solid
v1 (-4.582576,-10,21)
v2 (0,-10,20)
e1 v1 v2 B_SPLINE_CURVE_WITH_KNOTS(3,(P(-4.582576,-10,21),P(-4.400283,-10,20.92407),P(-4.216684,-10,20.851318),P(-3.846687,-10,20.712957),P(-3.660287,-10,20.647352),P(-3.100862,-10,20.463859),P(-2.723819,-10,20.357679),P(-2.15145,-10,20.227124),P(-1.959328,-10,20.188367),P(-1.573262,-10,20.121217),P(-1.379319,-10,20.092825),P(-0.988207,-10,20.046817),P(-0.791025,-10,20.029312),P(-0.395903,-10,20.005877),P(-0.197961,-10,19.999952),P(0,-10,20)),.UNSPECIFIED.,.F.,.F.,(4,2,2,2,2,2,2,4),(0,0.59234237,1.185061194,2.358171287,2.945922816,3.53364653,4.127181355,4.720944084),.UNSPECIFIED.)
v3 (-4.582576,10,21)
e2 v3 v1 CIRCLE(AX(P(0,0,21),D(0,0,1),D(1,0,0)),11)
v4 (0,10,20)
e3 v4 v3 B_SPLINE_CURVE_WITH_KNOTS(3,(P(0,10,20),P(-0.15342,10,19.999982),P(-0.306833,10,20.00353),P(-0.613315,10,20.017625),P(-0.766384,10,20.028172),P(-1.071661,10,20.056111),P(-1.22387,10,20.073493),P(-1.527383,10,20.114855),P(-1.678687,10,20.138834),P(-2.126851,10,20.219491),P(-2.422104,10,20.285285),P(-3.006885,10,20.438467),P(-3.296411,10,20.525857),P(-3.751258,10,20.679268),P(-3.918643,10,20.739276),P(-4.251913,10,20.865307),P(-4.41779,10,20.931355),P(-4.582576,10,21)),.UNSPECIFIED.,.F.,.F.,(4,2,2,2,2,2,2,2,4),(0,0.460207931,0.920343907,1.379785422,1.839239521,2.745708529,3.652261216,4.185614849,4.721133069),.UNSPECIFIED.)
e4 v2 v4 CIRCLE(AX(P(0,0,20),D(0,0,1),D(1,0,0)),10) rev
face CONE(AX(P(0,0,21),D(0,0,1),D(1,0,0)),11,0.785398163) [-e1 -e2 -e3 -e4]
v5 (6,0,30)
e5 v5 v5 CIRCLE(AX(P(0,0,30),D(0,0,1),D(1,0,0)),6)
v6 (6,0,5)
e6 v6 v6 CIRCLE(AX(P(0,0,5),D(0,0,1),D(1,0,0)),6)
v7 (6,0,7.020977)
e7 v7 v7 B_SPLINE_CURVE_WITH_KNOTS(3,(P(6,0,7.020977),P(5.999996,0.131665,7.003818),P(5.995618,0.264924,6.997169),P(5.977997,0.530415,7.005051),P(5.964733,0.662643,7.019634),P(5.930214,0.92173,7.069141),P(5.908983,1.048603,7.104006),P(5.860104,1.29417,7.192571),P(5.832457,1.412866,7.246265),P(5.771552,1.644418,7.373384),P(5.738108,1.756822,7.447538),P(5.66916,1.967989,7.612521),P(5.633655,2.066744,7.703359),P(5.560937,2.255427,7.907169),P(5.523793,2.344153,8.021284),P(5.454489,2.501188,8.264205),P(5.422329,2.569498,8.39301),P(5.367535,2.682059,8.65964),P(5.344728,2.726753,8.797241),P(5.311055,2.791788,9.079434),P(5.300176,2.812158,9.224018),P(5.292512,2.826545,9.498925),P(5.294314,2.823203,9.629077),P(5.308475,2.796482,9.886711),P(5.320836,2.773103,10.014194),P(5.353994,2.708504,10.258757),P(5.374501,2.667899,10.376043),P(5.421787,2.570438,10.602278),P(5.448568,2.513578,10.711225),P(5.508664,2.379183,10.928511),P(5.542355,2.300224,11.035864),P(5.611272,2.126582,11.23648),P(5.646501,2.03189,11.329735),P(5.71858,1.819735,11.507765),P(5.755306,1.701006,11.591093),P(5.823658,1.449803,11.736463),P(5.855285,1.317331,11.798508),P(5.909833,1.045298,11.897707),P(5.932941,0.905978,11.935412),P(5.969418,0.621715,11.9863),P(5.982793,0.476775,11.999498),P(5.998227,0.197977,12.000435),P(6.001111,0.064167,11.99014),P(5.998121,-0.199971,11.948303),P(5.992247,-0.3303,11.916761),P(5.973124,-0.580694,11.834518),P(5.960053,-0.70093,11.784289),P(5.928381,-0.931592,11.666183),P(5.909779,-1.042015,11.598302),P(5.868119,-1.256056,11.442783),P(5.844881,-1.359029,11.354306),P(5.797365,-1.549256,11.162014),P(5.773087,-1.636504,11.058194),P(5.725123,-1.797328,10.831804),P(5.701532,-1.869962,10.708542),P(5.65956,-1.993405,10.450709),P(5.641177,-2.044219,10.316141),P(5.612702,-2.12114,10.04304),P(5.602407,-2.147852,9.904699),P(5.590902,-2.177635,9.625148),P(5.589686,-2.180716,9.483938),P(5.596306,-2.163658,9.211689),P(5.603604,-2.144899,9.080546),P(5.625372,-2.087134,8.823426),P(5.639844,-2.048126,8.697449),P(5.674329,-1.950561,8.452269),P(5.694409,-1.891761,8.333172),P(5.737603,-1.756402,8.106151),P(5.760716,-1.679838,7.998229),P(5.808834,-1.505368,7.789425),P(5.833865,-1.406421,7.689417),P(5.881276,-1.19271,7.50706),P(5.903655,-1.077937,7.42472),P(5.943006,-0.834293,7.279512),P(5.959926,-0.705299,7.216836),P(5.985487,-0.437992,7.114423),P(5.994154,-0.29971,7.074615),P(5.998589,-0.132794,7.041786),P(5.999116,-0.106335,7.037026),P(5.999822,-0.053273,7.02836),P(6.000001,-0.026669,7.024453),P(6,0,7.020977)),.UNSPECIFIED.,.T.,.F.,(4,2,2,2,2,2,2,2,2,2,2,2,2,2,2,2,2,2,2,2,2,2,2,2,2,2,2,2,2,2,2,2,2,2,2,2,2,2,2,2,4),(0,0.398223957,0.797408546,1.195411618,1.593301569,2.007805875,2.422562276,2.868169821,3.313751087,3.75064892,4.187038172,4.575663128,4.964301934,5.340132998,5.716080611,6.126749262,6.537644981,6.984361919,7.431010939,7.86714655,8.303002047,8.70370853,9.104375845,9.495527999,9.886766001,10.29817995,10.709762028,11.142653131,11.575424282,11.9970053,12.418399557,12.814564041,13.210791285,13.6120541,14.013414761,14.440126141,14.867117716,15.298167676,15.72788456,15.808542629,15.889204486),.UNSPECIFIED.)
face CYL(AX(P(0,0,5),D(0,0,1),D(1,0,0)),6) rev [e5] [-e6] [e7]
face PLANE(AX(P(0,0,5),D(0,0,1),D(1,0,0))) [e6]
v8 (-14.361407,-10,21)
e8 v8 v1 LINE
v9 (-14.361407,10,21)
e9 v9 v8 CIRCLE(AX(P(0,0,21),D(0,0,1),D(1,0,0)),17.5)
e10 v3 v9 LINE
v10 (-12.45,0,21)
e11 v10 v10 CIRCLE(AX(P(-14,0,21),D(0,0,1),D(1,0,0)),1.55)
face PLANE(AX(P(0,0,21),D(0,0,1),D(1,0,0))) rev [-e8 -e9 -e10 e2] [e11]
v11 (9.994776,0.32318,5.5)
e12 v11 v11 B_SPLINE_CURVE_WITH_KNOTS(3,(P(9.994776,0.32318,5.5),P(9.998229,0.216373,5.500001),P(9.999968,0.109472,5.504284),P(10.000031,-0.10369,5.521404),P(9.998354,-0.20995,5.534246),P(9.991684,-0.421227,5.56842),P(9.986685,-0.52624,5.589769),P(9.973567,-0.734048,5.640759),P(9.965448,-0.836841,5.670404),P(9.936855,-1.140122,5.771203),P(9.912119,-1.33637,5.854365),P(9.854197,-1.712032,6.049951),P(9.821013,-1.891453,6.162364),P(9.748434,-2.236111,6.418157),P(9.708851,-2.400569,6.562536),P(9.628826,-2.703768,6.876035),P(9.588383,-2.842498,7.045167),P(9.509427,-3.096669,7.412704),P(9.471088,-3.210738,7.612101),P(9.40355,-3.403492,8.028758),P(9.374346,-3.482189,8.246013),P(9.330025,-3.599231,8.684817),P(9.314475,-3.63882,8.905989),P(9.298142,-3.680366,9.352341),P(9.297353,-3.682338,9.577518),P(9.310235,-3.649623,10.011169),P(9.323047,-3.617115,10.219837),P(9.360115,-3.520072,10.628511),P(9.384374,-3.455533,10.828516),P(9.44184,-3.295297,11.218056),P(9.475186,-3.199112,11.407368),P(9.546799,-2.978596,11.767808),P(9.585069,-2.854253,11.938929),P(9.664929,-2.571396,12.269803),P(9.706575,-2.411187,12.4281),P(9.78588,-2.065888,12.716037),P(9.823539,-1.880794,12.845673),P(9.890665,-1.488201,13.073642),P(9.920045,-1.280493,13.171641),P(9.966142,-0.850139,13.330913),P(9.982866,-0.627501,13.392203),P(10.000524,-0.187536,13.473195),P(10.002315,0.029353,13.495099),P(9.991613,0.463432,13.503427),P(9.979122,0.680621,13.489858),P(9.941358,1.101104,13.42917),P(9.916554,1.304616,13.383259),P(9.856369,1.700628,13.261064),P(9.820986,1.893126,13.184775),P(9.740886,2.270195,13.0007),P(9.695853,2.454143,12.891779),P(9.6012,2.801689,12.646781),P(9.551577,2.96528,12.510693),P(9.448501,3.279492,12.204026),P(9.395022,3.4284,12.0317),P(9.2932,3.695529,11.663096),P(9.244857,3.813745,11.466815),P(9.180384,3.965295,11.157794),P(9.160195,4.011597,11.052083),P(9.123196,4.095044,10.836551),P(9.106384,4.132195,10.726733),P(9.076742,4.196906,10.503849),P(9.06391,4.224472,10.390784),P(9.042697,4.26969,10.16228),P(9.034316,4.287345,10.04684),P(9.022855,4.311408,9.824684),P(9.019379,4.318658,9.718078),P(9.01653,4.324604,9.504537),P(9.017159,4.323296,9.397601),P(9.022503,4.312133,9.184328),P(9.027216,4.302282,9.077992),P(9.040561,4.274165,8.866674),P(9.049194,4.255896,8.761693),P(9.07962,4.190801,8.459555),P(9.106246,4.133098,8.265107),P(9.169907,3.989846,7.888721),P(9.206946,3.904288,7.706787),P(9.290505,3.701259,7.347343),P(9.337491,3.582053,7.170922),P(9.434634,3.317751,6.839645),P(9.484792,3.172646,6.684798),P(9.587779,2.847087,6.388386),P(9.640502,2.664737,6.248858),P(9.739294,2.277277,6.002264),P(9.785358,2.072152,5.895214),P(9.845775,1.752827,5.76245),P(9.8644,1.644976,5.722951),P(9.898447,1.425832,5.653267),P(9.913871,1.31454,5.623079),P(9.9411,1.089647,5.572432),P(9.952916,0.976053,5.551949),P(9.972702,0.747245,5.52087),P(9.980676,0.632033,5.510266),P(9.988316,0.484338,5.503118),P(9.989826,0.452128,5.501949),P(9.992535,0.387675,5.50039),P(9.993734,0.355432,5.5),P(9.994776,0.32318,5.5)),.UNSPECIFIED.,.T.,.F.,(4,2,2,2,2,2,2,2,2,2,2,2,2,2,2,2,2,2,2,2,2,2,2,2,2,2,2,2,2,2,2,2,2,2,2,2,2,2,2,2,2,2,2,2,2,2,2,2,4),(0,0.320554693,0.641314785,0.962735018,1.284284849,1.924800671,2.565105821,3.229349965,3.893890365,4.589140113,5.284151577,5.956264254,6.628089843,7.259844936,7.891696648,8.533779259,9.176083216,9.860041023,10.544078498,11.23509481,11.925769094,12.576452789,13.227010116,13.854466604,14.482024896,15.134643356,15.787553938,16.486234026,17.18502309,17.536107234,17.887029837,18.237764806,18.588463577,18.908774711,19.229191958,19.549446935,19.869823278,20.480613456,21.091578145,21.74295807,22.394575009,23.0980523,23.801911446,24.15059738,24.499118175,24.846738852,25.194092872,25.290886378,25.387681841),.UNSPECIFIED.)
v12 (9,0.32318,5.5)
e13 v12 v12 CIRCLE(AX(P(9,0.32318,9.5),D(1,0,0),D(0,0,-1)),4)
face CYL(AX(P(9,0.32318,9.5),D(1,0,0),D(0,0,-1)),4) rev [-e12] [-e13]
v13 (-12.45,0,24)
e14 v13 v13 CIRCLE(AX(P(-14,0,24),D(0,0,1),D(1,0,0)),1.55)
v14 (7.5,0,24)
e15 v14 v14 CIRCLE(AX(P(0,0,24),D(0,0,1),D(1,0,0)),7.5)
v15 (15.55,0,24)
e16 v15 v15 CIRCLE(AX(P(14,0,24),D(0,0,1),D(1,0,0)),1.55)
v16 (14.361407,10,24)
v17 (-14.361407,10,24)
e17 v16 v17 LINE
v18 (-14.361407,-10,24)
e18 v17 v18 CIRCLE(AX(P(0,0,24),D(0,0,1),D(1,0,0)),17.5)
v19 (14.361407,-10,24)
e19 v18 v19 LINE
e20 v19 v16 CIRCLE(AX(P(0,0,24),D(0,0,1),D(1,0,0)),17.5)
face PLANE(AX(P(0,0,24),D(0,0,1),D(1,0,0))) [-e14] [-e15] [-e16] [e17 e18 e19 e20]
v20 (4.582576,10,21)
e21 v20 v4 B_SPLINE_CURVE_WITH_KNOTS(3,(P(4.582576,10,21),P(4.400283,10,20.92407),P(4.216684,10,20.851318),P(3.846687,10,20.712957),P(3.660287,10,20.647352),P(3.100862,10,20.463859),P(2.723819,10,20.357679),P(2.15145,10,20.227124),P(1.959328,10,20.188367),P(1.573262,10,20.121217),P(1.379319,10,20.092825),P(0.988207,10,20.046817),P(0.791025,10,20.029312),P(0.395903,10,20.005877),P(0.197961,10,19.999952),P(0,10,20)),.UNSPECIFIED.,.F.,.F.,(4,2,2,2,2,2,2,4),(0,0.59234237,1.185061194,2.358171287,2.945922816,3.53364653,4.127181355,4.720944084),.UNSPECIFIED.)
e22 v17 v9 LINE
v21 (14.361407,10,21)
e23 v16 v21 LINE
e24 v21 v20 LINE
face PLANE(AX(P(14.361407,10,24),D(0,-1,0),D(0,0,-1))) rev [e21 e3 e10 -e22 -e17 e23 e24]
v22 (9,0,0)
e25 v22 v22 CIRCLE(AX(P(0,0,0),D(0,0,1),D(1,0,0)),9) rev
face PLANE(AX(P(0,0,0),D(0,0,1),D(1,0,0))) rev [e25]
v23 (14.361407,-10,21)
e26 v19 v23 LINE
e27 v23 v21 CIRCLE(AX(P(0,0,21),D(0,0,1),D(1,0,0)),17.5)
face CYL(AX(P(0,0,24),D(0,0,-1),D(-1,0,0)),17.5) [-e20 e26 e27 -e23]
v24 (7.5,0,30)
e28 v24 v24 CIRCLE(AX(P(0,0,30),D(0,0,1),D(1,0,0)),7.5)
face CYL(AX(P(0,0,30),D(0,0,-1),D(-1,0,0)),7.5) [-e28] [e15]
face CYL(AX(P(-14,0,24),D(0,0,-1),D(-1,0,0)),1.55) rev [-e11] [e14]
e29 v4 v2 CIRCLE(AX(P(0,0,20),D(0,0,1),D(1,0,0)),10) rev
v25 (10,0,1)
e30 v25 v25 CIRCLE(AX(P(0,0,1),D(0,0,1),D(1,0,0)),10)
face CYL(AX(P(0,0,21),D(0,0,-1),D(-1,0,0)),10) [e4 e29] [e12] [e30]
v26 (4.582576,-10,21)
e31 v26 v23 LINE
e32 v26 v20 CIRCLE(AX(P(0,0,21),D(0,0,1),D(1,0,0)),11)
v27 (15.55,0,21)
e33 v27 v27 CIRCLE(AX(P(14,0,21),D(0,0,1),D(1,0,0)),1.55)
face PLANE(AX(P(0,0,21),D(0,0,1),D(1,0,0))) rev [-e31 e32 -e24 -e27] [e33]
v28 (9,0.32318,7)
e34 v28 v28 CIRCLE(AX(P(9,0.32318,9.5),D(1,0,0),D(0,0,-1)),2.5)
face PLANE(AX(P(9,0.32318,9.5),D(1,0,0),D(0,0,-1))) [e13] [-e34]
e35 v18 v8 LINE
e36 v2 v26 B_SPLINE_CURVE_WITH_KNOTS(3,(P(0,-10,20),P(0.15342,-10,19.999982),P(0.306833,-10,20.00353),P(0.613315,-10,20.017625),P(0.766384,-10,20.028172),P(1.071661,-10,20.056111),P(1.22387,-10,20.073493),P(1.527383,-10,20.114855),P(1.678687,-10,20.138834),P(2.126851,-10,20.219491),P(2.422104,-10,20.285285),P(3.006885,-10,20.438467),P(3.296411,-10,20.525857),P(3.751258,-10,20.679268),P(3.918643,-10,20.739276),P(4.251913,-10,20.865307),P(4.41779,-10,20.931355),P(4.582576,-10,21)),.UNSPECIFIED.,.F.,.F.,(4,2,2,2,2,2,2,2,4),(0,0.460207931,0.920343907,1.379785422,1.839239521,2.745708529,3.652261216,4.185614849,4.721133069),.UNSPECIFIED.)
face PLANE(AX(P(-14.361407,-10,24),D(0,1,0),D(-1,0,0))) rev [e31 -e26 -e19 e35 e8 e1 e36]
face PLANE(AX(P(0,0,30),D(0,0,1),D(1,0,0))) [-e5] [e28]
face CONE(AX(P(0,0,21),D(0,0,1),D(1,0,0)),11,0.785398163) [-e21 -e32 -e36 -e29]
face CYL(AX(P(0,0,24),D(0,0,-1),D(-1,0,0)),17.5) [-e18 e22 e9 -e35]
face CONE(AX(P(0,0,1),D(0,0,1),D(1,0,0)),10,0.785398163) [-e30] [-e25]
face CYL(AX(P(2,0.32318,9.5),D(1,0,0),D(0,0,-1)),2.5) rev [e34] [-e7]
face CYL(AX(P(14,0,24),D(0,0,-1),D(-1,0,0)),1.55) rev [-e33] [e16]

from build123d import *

# Parameters (mm, degrees)
SKETCH2_R           = 10
BOSS_EXTRUDE1_DEPTH = 21
SKETCH3_R           = 1.55
BOSS_EXTRUDE3_DEPTH = 3
SKETCH4_R           = 7.5
BOSS_EXTRUDE4_DEPTH = 6
SKETCH5_R           = 6
CUT_EXTRUDE1_DEPTH  = 25
SKETCH6_R           = 4
CUT_EXTRUDE2_DEPTH  = 1
SKETCH7_R           = 2.5
CUT_EXTRUDE3_DEPTH  = 7
CHAMFER1_SIZE       = 1
CHAMFER2_SIZE       = 1


with BuildPart() as part:
    # Sketch2 → Boss-Extrude1 (new body)
    with BuildSketch(Plane.XY):
        with Locations(Location((0, 0, 0), (0, 0, 180))):
            Circle(SKETCH2_R)
    extrude(amount=BOSS_EXTRUDE1_DEPTH)

    # Sketch3 → Boss-Extrude3 (add)
    with BuildSketch(Plane.XY.offset(21)):
        with BuildLine():
            Line((14.361406616, 10), (-14.361406616, 10))
            ThreePointArc((-14.361406616, 10), (-17.5, 0), (-14.361406616, -10))
            Line((-14.361406616, -10), (14.361406616, -10))
            ThreePointArc((14.361406616, -10), (17.5, 0), (14.361406616, 10))
        make_face()
        with Locations((14, 0)):
            Circle(SKETCH3_R, mode=Mode.SUBTRACT)
        with Locations((-14, 0)):
            Circle(SKETCH3_R, mode=Mode.SUBTRACT)
    extrude(amount=BOSS_EXTRUDE3_DEPTH)

    # Sketch4 → Boss-Extrude4 (add)
    with BuildSketch(Plane.XY.offset(24)):
        Circle(SKETCH4_R)
    extrude(amount=BOSS_EXTRUDE4_DEPTH)

    # Sketch5 → Cut-Extrude1 (cut)
    with BuildSketch(Plane.XY.offset(30)):
        Circle(SKETCH5_R)
    extrude(amount=-CUT_EXTRUDE1_DEPTH, mode=Mode.SUBTRACT)

    # Sketch6 → Cut-Extrude2 (cut)
    with BuildSketch(Plane(origin=(10, 0, 0), x_dir=(0, 0, -1), z_dir=(1, 0, 0))):
        with Locations((-9.5, 0.3231801)):
            Circle(SKETCH6_R)
    extrude(amount=-CUT_EXTRUDE2_DEPTH, mode=Mode.SUBTRACT)

    # Sketch7 → Cut-Extrude3 (cut)
    with BuildSketch(Plane(origin=(9, 0, 0), x_dir=(0, 0, -1), z_dir=(1, 0, 0))):
        with Locations((-9.5, 0.3231801)):
            Circle(SKETCH7_R)
    extrude(amount=-CUT_EXTRUDE3_DEPTH, mode=Mode.SUBTRACT)

    # Chamfer1
    chamfer1_edges = [part.edges().sort_by_distance(p)[0] for p in [
        (10, 0, 0),
    ]]
    chamfer(chamfer1_edges, length=CHAMFER1_SIZE)

    # Chamfer2
    # the kernel refuses this chamfer: 1 mm, written as the material it adds along each edge
    with BuildSketch(Plane(origin=(0, 0, 21), x_dir=(-1, 0, 0), z_dir=(0, 1, 0))) as chamfer2_piece_1_section:
        Polygon((10, -CHAMFER2_SIZE), (10 + CHAMFER2_SIZE, 0), (10, 0), align=None)
    chamfer2_piece_1 = revolve(axis=Axis((0, 0, 21), (0, 0, 1)), revolution_arc=90.000000093, mode=Mode.PRIVATE)
    chamfer2_piece_1 = split(chamfer2_piece_1, bisect_by=Plane(origin=(-7.415105154, -10, 20.513457715), z_dir=(0, 1, 0)), keep=Keep.TOP, mode=Mode.PRIVATE)
    add(chamfer2_piece_1)
    with BuildSketch(Plane(origin=(0, 0, 21), x_dir=(1.6193002877922622e-09, -1.0, 0), z_dir=(-1.0, -1.6193002877922622e-09, 0))) as chamfer2_piece_2_section:
        Polygon((10, -CHAMFER2_SIZE), (10 + CHAMFER2_SIZE, 0), (10, 0), align=None)
    chamfer2_piece_2 = revolve(axis=Axis((0, 0, 21), (0, 0, 1)), revolution_arc=180.00000015, mode=Mode.PRIVATE)
    chamfer2_piece_2 = split(chamfer2_piece_2, bisect_by=Plane(origin=(10.48304434, 10, 20.516955657), z_dir=(0, -1, 0)), keep=Keep.TOP, mode=Mode.PRIVATE)
    chamfer2_piece_2 = split(chamfer2_piece_2, bisect_by=Plane(origin=(10.48304434, -10, 20.516955657), z_dir=(0, 1, 0)), keep=Keep.TOP, mode=Mode.PRIVATE)
    add(chamfer2_piece_2)
    with BuildSketch(Plane(origin=(0, 0, 21), x_dir=(-4.239322364523242e-09, 1.0, 0), z_dir=(1.0, 4.239322364523242e-09, 0))) as chamfer2_piece_3_section:
        Polygon((10, -CHAMFER2_SIZE), (10 + CHAMFER2_SIZE, 0), (10, 0), align=None)
    chamfer2_piece_3 = revolve(axis=Axis((0, 0, 21), (0, 0, 1)), revolution_arc=89.999999757, mode=Mode.PRIVATE)
    chamfer2_piece_3 = split(chamfer2_piece_3, bisect_by=Plane(origin=(-7.415105177, 10, 20.513457715), z_dir=(0, -1, 0)), keep=Keep.TOP, mode=Mode.PRIVATE)
    add(chamfer2_piece_3)


solid = part.part
